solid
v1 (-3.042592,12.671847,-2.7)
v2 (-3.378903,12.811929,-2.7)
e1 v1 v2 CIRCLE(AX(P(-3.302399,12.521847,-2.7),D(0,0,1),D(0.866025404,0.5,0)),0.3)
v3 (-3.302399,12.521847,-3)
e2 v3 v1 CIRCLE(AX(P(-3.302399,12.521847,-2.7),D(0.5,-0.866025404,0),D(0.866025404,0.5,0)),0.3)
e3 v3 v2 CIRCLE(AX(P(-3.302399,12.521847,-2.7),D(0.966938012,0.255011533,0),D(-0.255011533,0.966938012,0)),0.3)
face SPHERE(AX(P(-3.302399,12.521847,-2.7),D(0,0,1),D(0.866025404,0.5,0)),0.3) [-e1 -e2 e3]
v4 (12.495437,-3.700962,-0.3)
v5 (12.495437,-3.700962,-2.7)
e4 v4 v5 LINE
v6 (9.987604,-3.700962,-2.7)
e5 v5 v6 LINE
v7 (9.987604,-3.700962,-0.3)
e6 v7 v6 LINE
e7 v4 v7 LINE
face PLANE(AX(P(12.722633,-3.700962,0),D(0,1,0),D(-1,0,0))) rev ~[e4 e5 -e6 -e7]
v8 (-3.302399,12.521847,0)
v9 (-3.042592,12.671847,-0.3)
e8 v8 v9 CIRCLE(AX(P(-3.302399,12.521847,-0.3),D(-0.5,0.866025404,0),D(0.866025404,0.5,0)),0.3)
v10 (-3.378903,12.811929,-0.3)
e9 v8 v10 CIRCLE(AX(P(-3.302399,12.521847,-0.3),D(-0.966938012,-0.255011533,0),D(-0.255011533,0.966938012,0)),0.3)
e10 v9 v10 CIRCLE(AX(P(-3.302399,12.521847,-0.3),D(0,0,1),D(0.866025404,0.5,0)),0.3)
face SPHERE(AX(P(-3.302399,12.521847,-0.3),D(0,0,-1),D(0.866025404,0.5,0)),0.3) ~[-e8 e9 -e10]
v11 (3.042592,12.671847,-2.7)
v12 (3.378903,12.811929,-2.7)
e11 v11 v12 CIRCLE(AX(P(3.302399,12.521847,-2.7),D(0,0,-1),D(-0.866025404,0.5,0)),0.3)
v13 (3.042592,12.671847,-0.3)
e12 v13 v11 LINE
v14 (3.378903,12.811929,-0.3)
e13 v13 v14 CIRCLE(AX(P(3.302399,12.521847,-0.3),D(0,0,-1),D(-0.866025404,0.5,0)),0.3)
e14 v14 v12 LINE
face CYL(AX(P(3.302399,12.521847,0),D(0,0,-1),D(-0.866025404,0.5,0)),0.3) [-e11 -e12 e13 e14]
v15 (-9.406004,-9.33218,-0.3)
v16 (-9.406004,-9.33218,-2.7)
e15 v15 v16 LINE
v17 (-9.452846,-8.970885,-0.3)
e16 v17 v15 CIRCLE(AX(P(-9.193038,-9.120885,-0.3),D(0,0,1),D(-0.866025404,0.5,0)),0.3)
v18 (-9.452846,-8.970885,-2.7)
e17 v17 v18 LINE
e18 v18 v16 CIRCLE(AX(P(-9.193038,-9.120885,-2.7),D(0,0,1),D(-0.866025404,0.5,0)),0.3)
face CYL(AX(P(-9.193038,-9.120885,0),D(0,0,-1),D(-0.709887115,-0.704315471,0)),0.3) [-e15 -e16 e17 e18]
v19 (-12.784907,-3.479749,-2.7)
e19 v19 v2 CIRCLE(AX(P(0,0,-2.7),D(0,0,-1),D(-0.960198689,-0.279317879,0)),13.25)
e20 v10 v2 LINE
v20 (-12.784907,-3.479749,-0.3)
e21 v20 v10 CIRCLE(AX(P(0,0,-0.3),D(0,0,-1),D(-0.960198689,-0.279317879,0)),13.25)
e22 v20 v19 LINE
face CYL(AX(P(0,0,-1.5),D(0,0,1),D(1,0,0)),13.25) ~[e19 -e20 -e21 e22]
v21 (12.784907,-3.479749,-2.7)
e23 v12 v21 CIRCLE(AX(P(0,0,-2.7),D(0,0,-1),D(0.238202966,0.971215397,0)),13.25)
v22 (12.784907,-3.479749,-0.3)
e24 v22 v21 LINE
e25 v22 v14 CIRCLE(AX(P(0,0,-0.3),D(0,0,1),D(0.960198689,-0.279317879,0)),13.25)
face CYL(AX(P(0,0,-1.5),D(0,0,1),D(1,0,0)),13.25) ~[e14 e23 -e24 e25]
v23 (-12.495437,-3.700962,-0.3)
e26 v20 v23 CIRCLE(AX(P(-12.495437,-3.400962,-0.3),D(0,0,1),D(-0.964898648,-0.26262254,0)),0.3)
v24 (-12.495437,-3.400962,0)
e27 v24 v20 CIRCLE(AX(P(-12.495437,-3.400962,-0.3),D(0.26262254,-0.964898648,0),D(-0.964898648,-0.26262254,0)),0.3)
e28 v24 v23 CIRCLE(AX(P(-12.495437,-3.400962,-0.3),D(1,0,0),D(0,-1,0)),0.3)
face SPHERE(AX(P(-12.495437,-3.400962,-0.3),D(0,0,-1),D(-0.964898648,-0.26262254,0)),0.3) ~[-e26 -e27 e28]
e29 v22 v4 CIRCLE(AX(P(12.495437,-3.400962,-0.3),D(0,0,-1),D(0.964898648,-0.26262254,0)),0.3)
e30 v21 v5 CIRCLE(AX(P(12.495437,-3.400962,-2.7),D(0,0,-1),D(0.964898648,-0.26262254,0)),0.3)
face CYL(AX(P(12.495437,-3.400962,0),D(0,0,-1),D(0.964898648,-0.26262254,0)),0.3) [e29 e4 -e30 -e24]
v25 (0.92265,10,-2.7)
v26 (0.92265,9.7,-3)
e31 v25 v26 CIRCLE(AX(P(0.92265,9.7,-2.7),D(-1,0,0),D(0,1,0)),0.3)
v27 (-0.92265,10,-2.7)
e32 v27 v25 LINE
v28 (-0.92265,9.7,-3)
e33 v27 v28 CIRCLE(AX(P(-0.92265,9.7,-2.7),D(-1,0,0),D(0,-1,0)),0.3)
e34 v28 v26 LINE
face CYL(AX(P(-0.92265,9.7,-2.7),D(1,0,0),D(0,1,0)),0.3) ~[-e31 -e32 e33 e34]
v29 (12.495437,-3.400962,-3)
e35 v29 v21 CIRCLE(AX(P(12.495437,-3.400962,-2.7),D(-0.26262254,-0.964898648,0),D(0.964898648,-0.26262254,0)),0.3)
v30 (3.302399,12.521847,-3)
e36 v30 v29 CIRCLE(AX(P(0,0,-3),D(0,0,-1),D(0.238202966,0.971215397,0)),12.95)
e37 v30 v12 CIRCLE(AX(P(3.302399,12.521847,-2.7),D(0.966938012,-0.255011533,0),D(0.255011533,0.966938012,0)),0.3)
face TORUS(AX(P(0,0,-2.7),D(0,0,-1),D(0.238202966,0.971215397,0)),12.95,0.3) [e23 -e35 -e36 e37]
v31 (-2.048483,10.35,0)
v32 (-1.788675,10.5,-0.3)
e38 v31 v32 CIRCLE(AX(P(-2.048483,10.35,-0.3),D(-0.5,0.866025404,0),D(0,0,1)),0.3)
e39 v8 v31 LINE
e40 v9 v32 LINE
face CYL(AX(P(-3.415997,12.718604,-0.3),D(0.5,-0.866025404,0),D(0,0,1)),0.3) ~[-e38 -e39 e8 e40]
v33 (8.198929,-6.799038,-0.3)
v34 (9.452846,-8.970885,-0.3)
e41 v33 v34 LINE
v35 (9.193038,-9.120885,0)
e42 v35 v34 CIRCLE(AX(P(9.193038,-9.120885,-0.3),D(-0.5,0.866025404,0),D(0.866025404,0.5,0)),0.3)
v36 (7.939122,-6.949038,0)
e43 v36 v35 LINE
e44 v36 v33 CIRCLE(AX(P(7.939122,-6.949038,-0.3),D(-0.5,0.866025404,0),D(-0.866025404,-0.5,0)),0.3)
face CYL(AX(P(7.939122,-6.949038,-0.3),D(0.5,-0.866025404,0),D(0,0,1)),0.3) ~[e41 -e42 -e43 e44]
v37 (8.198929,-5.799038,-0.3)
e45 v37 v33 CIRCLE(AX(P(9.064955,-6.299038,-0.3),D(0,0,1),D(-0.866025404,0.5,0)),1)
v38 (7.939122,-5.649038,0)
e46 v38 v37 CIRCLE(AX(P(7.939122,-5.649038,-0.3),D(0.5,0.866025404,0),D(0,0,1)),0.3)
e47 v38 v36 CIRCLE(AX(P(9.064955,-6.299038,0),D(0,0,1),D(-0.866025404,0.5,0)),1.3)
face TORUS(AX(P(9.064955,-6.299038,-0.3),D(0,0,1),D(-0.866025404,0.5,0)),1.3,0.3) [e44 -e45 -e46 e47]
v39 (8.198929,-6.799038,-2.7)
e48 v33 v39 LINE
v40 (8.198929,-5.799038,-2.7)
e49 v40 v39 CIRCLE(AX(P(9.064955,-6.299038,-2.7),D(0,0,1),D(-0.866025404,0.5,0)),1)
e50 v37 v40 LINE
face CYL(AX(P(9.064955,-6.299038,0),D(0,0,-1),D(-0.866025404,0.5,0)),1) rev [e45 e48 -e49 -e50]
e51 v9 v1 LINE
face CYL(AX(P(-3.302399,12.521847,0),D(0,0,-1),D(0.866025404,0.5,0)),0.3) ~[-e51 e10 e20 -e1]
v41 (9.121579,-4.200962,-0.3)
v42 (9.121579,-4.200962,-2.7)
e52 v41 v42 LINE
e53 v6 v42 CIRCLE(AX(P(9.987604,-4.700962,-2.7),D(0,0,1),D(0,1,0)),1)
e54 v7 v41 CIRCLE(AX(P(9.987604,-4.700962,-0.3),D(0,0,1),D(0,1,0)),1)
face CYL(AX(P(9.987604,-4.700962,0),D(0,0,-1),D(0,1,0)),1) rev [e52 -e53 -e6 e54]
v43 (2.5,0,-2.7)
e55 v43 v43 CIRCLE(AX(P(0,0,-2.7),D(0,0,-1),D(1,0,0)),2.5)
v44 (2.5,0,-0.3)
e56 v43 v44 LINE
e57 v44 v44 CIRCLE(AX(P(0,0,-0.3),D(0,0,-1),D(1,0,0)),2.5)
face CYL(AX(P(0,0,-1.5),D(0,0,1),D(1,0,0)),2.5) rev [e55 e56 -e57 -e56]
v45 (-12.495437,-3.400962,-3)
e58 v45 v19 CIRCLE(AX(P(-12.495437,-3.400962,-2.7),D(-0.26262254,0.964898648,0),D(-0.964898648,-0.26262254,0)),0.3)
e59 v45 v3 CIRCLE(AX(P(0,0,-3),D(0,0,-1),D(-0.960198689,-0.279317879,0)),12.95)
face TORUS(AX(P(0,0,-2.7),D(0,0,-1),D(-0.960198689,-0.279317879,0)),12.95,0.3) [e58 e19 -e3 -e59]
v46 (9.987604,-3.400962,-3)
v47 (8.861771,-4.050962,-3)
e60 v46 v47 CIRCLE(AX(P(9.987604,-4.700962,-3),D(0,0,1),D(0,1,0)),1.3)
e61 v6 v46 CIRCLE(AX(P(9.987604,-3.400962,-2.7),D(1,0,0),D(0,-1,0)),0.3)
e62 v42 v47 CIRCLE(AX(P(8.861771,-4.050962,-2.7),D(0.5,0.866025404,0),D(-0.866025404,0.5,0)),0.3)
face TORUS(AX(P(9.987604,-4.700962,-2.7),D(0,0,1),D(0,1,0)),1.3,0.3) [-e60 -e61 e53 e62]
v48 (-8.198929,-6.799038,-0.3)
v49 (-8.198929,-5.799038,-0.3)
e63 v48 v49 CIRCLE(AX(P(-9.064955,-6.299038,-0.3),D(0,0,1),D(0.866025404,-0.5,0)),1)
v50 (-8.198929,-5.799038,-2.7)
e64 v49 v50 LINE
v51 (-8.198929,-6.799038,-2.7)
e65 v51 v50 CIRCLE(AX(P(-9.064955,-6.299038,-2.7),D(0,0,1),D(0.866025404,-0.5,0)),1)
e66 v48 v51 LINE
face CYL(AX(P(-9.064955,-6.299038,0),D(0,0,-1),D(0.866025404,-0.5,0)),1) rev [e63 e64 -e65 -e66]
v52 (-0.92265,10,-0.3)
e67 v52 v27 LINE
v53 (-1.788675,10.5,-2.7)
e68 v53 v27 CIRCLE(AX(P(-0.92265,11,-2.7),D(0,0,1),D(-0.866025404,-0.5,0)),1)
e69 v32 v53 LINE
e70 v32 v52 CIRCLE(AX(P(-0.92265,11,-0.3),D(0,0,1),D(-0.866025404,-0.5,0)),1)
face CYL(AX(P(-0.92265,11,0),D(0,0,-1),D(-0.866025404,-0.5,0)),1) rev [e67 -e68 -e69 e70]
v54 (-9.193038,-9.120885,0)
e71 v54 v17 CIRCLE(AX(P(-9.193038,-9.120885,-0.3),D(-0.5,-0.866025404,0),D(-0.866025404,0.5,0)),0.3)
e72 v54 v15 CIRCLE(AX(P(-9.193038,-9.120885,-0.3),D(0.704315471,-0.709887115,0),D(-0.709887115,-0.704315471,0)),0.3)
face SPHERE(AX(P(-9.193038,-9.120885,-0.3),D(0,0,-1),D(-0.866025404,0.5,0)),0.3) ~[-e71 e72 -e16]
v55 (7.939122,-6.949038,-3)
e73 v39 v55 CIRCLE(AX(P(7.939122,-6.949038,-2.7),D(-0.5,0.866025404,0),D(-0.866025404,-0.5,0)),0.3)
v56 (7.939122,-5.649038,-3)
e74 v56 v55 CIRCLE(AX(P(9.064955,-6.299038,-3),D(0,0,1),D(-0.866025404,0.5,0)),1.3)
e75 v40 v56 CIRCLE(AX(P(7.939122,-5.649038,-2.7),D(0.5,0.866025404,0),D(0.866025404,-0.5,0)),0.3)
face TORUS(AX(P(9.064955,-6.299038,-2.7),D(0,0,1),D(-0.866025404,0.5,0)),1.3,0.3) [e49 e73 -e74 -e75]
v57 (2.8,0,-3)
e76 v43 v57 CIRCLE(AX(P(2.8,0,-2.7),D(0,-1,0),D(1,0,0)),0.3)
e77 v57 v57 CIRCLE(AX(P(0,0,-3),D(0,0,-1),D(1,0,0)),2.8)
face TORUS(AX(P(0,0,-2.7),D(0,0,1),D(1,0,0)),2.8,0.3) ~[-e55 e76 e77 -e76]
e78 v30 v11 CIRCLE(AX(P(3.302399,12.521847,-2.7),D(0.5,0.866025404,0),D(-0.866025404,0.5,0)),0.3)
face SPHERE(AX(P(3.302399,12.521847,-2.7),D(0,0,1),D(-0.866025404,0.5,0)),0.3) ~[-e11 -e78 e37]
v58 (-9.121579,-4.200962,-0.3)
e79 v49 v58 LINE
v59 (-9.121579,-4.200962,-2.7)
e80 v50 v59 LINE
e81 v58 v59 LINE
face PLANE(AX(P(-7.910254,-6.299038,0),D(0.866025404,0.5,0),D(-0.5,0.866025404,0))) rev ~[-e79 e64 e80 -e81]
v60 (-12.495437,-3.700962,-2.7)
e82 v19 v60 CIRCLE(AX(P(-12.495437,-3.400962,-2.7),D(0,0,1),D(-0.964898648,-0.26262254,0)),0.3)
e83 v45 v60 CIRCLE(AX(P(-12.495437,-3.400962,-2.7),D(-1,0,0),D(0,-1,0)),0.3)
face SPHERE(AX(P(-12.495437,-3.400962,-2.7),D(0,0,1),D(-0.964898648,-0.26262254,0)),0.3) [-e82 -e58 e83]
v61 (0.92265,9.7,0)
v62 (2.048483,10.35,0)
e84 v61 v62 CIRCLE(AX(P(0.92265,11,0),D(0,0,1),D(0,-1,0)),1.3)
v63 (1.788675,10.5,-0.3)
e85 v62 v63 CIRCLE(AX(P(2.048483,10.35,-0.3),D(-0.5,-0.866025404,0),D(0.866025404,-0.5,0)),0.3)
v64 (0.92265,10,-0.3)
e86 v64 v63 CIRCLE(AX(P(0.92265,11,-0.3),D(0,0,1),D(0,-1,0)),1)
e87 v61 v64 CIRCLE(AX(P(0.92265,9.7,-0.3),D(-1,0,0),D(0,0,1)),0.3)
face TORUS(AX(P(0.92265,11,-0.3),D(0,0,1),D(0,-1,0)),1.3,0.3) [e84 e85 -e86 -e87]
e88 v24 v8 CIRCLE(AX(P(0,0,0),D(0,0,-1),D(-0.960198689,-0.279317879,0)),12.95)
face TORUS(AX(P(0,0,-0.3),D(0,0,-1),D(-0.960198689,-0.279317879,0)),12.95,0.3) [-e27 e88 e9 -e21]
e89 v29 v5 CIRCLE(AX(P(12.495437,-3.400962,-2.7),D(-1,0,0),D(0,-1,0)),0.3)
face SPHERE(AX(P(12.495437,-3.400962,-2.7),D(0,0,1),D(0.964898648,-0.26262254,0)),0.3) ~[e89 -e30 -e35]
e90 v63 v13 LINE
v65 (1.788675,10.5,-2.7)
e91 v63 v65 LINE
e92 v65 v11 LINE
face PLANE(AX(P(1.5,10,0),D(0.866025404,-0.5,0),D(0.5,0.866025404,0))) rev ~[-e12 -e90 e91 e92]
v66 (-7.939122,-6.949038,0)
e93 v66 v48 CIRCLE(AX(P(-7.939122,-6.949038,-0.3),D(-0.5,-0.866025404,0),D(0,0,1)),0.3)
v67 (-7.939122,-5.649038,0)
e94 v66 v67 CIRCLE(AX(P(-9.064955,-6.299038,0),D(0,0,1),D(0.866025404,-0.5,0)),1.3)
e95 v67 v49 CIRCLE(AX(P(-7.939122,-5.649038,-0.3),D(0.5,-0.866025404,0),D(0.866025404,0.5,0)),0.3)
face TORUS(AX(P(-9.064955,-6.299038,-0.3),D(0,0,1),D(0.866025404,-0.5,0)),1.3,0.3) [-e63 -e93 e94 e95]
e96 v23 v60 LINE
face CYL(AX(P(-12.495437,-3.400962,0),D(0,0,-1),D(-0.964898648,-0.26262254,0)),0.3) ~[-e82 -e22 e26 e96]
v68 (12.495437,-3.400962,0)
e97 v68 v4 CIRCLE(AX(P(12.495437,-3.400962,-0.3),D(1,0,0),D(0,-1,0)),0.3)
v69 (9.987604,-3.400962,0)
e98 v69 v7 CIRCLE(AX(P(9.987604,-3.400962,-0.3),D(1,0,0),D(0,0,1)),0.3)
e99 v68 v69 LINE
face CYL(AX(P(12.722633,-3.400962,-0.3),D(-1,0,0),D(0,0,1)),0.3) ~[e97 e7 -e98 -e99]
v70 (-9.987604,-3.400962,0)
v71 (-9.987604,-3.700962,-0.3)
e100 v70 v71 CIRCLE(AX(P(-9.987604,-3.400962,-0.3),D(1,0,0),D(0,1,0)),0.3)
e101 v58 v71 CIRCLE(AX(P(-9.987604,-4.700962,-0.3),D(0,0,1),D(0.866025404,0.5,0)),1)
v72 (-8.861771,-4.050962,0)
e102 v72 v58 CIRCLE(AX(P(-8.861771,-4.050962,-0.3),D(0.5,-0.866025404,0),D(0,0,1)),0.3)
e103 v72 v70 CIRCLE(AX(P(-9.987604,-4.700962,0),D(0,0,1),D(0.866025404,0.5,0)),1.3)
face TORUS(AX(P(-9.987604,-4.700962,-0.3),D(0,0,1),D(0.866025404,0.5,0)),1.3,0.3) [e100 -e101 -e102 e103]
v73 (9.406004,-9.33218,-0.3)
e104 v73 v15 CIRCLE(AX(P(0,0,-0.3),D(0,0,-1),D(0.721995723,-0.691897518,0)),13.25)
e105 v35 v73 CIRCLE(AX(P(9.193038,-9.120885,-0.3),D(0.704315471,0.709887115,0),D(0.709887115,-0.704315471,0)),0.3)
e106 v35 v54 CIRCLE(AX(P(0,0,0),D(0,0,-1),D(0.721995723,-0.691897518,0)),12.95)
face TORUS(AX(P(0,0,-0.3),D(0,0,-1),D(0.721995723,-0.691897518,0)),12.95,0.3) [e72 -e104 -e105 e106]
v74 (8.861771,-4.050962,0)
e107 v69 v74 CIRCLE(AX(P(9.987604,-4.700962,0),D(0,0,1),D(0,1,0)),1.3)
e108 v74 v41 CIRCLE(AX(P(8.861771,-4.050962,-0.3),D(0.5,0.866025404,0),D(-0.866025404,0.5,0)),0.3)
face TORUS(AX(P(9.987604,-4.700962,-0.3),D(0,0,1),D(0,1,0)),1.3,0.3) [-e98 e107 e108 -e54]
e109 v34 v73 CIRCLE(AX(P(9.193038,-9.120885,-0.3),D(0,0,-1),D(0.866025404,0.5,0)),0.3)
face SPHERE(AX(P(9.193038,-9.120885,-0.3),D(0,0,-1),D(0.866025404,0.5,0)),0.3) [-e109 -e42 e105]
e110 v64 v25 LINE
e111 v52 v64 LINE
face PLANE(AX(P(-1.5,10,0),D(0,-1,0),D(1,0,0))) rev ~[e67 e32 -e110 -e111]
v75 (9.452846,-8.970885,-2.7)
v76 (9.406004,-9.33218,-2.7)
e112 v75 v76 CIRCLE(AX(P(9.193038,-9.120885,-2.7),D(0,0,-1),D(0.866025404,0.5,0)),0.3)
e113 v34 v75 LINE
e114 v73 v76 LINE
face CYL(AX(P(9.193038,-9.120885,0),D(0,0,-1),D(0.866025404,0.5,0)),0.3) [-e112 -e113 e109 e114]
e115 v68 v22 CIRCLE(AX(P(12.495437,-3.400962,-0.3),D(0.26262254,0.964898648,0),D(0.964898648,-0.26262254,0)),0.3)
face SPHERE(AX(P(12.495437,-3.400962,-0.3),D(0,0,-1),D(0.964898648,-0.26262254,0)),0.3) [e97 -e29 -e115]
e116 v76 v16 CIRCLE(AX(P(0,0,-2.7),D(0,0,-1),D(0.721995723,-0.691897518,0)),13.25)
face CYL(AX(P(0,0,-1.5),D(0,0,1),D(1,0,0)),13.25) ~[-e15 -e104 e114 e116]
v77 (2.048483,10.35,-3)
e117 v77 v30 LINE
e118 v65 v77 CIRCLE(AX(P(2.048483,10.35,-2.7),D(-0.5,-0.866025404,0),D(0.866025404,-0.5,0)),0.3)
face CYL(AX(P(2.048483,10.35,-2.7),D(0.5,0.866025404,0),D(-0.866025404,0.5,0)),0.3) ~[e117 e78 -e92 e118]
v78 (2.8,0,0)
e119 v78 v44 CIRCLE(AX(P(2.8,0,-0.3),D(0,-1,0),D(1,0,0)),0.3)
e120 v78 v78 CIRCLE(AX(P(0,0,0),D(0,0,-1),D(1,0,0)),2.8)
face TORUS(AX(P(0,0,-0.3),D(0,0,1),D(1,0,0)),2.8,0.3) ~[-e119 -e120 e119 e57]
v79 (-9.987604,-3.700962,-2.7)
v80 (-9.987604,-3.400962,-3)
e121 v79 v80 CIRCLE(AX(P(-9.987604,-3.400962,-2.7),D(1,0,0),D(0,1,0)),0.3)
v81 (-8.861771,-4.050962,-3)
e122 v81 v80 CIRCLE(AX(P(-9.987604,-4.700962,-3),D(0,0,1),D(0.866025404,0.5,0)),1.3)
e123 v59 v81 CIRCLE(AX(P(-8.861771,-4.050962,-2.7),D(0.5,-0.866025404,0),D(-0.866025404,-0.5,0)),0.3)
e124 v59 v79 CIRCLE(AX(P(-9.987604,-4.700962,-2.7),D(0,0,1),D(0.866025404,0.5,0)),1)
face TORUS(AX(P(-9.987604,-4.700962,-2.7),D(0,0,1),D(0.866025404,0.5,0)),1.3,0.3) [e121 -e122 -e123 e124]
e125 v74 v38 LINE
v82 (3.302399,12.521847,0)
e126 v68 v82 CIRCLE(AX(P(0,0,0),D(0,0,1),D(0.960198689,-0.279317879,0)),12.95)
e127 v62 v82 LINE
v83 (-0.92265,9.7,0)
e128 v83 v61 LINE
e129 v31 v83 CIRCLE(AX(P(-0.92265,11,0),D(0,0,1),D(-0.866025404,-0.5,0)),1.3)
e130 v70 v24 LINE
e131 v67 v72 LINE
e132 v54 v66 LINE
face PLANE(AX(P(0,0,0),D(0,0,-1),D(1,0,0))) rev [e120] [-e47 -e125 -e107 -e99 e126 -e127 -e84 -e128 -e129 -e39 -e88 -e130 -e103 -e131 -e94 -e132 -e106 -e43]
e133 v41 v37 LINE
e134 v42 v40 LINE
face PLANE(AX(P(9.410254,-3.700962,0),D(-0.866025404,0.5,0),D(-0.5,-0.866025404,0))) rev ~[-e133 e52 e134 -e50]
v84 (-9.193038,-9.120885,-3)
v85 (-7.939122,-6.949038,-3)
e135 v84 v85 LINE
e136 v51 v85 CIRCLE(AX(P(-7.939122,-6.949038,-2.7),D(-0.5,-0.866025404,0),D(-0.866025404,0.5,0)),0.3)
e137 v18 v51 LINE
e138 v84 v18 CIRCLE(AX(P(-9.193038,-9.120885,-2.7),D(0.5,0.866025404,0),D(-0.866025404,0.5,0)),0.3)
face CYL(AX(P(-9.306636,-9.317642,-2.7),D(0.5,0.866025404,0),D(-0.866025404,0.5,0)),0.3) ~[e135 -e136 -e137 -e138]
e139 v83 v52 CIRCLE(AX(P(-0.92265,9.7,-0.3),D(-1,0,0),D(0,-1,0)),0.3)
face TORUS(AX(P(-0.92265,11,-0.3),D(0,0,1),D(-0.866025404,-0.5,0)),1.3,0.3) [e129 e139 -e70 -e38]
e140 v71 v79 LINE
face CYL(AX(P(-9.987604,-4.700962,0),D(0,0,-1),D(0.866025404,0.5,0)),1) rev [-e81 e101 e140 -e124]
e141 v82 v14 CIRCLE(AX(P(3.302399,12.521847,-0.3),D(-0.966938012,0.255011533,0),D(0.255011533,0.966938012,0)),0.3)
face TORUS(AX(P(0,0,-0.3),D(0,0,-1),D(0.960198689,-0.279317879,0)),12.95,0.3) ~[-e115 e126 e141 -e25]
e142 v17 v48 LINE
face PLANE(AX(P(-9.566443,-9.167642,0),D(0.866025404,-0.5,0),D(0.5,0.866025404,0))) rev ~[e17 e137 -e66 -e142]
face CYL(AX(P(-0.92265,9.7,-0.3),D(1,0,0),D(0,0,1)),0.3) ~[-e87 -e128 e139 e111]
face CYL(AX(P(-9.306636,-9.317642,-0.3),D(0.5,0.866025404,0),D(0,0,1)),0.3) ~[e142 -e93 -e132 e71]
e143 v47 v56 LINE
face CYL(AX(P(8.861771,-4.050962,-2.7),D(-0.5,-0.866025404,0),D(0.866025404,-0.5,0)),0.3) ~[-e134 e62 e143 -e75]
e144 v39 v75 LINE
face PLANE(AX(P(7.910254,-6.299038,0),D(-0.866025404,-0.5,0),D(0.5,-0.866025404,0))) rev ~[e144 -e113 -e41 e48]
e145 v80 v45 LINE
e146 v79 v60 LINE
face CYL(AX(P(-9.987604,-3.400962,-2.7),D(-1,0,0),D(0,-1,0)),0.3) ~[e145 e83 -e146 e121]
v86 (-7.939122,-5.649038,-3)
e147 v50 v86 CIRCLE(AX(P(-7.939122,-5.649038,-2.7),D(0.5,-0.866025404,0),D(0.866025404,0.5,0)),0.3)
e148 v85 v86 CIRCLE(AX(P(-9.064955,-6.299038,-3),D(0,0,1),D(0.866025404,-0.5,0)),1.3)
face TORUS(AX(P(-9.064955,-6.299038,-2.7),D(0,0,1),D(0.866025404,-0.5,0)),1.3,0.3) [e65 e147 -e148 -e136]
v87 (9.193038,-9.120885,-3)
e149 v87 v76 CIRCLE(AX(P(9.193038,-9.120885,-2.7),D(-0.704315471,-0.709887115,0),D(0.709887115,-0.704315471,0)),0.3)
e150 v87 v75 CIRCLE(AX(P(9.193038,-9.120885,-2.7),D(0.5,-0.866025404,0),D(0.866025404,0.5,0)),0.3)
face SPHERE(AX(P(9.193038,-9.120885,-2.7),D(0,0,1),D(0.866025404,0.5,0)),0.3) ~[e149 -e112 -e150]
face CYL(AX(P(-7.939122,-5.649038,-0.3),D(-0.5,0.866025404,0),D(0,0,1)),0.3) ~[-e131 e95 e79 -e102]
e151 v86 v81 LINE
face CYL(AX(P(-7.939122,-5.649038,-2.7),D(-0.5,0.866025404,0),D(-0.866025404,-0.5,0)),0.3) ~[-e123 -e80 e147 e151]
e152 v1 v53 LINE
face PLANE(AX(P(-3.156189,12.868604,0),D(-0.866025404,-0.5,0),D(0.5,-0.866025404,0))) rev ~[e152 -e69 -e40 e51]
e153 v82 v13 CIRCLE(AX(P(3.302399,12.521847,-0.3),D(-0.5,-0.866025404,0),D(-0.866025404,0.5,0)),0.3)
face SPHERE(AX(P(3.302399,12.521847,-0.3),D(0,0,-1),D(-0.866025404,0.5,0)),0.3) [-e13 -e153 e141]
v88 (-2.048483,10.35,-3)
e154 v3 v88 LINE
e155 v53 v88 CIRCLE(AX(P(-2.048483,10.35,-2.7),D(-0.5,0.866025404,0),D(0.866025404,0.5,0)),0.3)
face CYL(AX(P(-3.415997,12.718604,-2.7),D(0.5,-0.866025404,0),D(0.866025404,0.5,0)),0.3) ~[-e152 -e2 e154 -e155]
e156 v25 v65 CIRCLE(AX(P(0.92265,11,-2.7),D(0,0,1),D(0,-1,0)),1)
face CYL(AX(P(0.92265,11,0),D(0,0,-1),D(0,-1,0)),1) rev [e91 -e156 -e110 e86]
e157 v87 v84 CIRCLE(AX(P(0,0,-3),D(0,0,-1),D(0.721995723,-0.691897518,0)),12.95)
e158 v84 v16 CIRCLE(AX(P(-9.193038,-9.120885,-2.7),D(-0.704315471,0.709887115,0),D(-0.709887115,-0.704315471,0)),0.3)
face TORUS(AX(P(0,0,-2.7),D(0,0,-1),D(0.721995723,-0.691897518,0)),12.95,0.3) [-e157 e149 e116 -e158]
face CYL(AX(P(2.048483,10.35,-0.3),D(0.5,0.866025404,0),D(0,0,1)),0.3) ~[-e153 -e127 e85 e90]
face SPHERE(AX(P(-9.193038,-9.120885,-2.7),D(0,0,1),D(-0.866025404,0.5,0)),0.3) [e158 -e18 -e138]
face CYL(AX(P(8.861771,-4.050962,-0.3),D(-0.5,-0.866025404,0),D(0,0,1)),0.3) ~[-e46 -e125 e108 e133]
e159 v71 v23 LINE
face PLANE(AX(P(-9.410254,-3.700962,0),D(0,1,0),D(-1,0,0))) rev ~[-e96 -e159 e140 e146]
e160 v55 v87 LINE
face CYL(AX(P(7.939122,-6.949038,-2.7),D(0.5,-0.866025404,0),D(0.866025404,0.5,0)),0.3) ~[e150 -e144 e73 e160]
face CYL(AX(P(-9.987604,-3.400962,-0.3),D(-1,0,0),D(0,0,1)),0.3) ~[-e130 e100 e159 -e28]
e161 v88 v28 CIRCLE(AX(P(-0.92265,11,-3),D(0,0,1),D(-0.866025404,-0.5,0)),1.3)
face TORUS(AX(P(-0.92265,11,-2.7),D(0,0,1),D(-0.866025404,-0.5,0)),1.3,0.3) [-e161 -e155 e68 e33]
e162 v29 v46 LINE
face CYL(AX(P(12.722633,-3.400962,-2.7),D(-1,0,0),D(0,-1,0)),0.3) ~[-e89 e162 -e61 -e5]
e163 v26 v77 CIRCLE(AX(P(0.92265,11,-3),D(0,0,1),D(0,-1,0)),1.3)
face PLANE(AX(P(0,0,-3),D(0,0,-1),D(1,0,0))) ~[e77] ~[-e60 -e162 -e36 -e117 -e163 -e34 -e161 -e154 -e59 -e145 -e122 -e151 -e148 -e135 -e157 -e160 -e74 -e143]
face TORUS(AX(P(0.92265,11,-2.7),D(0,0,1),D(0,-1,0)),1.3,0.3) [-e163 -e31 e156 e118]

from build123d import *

# Parameters (mm, degrees)
F0_W     = 10.75
F0_H     = 3
F3_DEPTH = 25
F4_R     = 1
F5_R     = 0.3


# Not quite as in the source:
# - a feature names something its author has since deleted; it is built from what else it names


with BuildPart() as f1:
    # F0 (on Front) → F1 (revolve)
    with BuildSketch(Plane.XZ):
        with Locations((7.875, -1.5)):
            Rectangle(F0_W, F0_H)
    revolve(axis=Axis((0, 0, -1.5), (0, 0, -1)))

    # F2 (on face) → F3 (cut)
    with BuildSketch(Plane.XY):
        with BuildLine():
            Line((1.5, 10), (3.1561892964, 12.8686040084))
            ThreePointArc((3.1561892964, 12.8686040084), (0, 13.25), (-3.1561892964, 12.8686040084))
            Line((-3.1561892964, 12.8686040084), (-1.5, 10))
            Line((-1.5, 10), (1.5, 10))
        make_face()
        with BuildLine():
            ThreePointArc((-12.7226326307, -3.7009618943), (-11.4748366001, -6.625), (-9.5664433343, -9.1676421141))
            Line((-9.5664433343, -9.1676421141), (-7.9102540378, -6.2990381057))
            Line((-7.9102540378, -6.2990381057), (-9.4102540378, -3.7009618943))
            Line((-9.4102540378, -3.7009618943), (-12.7226326307, -3.7009618943))
        make_face()
        with BuildLine():
            ThreePointArc((9.5664433343, -9.1676421141), (11.4748366001, -6.625), (12.7226326307, -3.7009618943))
            Line((12.7226326307, -3.7009618943), (9.4102540378, -3.7009618943))
            Line((9.4102540378, -3.7009618943), (7.9102540378, -6.2990381057))
            Line((7.9102540378, -6.2990381057), (9.5664433343, -9.1676421141))
        make_face()
    extrude(amount=-F3_DEPTH, mode=Mode.SUBTRACT)

    # F4
    f4_edges = [f1.edges().sort_by_distance(p)[0] for p in [
        (-9.410254, -3.700962, -1.5),
        (-7.910254, -6.299038, -1.5),
        (7.910254, -6.299038, -1.5),
        (9.410254, -3.700962, -1.5),
        (1.5, 10, -1.5),
        (-1.5, 10, -1.5),
    ]]
    fillet(f4_edges, radius=F4_R)

    # F5
    f5_edges = [f1.edges().sort_by_distance(p)[0] for p in [
        (2.472432, 11.684302, 0),
        (1.42265, 10.133975, 0),
        (11.474837, 6.625, 0),
        (0, 10, 0),
        (11.355118, -3.700962, 0),
        (-1.42265, 10.133975, 0),
        (9.487604, -3.834936, 0),
        (-2.472432, 11.684302, 0),
        (8.660254, -5, 0),
        (-11.474837, 6.625, 0),
        (8.064955, -6.299038, 0),
        (-11.355118, -3.700962, 0),
        (8.882686, -7.98334, 0),
        (-9.487604, -3.834936, 0),
        (0, -13.25, 0),
        (-8.660254, -5, 0),
        (-8.882686, -7.98334, 0),
        (-8.064955, -6.299038, 0),
        (-2.5, 0, 0),
        (12.722633, -3.700962, -1.5),
        (9.566443, -9.167642, -1.5),
        (-9.566443, -9.167642, -1.5),
        (-12.722633, -3.700962, -1.5),
        (2.472432, 11.684302, -3),
        (1.42265, 10.133975, -3),
        (11.474837, 6.625, -3),
        (0, 10, -3),
        (11.355118, -3.700962, -3),
        (-1.42265, 10.133975, -3),
        (9.487604, -3.834936, -3),
        (-2.472432, 11.684302, -3),
        (8.660254, -5, -3),
        (-11.474837, 6.625, -3),
        (8.064955, -6.299038, -3),
        (-11.355118, -3.700962, -3),
        (8.882686, -7.98334, -3),
        (-9.487604, -3.834936, -3),
        (0, -13.25, -3),
        (-8.660254, -5, -3),
        (-8.882686, -7.98334, -3),
        (-8.064955, -6.299038, -3),
        (-2.5, 0, -3),
        (-3.156189, 12.868604, -1.5),
        (3.156189, 12.868604, -1.5),
    ]]
    fillet(f5_edges, radius=F5_R)


solid = f1.part
